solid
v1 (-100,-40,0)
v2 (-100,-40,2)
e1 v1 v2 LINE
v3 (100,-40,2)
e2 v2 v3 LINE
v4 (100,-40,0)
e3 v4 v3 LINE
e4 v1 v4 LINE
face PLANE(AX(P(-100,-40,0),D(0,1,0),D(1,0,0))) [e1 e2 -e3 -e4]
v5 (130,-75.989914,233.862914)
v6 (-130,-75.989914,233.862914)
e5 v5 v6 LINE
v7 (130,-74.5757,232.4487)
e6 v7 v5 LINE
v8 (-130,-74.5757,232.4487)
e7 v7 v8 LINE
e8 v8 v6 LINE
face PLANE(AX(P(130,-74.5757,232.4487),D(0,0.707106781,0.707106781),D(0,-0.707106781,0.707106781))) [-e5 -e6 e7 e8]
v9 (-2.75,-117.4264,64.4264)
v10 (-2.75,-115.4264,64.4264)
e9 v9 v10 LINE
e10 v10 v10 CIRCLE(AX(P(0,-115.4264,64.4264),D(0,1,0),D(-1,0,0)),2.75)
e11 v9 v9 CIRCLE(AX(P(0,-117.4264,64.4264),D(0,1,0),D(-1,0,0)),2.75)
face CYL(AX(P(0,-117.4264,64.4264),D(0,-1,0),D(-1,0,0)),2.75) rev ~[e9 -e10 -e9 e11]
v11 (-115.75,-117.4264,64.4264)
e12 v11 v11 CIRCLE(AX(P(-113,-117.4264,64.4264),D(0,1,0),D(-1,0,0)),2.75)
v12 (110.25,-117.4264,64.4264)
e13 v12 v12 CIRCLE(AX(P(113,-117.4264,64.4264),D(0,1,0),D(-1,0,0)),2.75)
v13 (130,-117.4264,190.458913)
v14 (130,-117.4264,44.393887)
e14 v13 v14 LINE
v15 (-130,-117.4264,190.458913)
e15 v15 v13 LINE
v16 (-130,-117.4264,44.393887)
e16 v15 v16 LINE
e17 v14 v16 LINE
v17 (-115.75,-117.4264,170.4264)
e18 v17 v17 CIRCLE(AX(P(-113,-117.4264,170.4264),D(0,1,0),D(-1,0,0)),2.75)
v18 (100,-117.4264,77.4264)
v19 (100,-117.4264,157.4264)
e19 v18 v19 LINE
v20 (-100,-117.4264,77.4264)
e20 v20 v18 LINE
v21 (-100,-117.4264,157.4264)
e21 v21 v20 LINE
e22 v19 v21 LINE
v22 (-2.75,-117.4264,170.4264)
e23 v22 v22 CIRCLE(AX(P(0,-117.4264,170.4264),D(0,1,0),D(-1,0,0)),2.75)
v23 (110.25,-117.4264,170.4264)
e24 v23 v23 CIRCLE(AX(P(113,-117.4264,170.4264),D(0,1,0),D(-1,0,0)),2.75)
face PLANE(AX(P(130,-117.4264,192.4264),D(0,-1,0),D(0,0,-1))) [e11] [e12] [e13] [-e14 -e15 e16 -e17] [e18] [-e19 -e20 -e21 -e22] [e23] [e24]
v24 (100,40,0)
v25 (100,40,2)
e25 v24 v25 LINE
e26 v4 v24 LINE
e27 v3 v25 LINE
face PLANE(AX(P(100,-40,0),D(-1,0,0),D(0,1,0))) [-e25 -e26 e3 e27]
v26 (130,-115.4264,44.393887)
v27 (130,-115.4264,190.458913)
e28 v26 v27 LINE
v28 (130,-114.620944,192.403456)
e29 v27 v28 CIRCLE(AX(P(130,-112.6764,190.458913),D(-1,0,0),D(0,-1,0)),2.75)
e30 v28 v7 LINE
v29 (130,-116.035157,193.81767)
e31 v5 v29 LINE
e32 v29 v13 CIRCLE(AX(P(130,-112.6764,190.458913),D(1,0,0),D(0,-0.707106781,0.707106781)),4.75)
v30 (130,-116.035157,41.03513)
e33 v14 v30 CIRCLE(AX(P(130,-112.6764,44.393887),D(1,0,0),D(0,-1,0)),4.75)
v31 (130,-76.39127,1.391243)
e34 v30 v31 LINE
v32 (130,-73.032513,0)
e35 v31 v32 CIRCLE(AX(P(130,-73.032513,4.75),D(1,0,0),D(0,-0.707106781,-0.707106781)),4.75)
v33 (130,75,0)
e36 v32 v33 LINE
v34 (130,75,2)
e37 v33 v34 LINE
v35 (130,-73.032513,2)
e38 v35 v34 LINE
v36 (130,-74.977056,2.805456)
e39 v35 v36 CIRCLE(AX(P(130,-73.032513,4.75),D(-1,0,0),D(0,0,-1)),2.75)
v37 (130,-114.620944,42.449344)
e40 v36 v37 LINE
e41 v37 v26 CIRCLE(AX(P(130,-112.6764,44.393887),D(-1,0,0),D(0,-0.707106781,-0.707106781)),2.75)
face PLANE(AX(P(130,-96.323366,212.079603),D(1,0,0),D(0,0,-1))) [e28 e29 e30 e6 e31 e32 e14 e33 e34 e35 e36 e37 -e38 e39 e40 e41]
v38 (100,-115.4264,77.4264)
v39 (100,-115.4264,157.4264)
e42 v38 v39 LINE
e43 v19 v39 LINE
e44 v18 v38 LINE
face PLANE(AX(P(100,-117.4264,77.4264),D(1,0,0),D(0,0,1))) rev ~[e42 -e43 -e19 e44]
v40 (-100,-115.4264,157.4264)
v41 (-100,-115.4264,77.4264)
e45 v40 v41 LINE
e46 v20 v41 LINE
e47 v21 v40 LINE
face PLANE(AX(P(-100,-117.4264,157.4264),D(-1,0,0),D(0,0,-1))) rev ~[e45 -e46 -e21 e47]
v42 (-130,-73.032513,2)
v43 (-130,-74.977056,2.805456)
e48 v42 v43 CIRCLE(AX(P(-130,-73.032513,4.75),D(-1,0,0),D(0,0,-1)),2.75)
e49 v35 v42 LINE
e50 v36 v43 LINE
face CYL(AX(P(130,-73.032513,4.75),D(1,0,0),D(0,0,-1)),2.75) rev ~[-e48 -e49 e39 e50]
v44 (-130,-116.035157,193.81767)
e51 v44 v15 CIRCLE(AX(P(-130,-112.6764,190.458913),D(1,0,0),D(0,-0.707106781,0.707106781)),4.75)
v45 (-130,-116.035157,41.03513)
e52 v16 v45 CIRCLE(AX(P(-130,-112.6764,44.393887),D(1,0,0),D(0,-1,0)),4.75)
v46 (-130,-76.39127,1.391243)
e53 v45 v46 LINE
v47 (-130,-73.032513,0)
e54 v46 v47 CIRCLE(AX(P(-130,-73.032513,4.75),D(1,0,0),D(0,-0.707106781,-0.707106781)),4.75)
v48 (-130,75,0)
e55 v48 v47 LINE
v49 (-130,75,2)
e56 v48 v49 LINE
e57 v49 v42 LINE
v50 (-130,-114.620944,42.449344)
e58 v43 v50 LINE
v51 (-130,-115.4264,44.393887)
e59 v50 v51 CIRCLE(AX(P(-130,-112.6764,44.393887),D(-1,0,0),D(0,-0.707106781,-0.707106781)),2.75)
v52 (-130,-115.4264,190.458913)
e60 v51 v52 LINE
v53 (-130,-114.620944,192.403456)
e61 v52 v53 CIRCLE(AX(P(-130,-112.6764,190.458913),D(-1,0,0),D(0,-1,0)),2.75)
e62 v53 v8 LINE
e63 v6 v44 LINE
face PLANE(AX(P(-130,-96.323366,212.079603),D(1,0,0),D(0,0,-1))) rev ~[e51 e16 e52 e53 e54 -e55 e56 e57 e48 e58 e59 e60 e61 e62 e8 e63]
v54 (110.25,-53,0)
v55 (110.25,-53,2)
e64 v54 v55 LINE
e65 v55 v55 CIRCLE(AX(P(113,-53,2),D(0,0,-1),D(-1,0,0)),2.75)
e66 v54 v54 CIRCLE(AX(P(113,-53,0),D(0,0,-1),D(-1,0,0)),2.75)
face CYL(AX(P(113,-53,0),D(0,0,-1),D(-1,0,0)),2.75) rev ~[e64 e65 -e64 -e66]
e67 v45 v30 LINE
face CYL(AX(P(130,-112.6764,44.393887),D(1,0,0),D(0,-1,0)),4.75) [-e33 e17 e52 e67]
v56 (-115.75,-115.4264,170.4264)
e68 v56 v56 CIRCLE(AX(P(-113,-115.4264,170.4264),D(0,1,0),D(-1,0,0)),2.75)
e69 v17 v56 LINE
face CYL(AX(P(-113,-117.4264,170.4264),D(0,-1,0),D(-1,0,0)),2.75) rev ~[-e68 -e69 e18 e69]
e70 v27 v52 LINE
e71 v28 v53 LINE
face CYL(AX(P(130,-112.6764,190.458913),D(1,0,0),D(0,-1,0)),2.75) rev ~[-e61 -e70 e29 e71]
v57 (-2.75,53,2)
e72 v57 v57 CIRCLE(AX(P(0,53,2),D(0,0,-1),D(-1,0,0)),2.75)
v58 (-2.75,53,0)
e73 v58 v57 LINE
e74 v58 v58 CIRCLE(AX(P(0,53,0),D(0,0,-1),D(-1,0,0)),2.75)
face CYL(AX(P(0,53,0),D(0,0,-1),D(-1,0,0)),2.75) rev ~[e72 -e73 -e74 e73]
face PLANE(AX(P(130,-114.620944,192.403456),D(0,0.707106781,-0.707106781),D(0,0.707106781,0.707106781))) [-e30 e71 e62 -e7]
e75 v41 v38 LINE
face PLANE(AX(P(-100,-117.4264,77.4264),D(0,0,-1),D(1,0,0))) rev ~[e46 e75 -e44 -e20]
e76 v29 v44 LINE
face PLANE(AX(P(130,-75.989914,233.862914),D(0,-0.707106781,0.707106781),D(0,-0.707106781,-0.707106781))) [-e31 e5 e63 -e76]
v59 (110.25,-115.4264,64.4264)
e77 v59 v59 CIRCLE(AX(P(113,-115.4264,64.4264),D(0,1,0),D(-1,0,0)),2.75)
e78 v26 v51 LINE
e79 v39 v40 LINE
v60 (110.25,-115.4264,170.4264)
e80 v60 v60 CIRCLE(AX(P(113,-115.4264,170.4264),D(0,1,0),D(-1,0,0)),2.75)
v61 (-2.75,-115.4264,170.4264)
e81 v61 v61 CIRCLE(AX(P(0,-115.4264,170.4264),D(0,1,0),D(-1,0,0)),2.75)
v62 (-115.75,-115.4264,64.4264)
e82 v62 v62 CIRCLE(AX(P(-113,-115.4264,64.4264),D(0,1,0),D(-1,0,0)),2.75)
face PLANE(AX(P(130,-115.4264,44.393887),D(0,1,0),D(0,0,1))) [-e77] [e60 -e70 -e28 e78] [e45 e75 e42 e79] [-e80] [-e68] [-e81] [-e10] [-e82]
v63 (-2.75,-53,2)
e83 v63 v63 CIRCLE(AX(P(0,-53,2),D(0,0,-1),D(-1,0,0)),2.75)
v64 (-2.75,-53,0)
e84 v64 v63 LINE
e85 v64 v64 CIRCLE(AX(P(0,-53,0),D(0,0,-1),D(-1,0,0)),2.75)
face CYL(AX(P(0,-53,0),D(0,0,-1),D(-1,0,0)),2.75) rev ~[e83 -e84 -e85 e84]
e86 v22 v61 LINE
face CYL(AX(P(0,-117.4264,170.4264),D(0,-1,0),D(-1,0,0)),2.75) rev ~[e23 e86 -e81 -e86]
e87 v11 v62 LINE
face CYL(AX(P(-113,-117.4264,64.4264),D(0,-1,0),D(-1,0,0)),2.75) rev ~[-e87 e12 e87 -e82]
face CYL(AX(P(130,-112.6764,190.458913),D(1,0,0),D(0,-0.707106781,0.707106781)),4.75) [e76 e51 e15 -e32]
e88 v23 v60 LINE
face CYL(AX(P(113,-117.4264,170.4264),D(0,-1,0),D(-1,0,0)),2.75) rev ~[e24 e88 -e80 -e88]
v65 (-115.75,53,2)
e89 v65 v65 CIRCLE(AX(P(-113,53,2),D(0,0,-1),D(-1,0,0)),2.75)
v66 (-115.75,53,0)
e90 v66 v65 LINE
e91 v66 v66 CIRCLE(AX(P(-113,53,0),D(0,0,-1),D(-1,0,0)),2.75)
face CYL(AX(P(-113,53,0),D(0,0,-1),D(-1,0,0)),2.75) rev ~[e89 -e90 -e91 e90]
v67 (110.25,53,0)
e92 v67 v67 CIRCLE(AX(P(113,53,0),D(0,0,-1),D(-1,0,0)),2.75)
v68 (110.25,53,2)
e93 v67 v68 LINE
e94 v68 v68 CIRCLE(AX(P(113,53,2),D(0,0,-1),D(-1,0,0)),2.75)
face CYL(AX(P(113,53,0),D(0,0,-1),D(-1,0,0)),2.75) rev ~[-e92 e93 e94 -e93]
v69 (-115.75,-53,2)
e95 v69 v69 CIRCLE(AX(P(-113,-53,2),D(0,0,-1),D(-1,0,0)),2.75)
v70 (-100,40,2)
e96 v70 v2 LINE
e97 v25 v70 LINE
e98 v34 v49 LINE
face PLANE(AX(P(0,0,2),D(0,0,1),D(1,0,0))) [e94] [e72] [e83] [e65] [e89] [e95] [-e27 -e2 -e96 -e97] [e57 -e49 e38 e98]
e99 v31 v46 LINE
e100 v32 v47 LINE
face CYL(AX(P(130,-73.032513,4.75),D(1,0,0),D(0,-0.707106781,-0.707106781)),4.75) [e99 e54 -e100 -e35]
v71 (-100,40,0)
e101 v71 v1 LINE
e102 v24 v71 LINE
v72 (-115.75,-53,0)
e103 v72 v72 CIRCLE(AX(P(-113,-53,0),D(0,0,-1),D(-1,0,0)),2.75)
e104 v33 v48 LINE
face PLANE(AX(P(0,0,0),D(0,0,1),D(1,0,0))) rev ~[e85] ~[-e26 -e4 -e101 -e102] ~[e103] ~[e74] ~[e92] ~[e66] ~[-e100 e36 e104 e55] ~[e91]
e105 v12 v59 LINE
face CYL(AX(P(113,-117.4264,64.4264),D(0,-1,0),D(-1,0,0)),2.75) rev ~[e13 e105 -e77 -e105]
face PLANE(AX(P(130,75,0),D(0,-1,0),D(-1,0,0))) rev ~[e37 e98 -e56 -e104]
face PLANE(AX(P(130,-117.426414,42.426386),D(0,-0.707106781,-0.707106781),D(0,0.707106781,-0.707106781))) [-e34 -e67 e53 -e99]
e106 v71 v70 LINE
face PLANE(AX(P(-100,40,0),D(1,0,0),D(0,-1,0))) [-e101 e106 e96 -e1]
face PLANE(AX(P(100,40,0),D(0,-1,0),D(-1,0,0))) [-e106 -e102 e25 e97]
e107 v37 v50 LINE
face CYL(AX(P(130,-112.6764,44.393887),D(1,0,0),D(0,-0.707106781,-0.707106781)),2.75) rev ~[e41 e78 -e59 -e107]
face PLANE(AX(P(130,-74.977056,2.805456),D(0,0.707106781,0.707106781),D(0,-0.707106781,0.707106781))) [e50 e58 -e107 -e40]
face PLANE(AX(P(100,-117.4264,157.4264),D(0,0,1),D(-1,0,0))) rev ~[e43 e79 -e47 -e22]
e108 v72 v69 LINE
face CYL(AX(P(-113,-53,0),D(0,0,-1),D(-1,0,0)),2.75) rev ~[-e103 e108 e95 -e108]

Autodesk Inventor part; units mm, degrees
ref_plane "YZ Plane" through (0, 0, 0) normal (1, 0, 0) x (0, 1, 0)
ref_plane "XZ Plane" through (0, 0, 0) normal (0, 1, 0) x (-1, 0, 0)
sketch "Sketch1" plane through (0, 0, 0) normal (0, 0, 1) x (1, 0, 0)
  line L0 (130, 75) -> (-130, 75)
  line L1 (-130, 75) -> (-130, -75)
  line L2 (-130, -75) -> (130, -75)
  line L3 (130, -75) -> (130, 75)
  line L4 (130, 75) -> (-130, -75) construction
  line L5 (-130, 75) -> (130, -75) construction
  line L6 (100, 40) -> (-100, 40)
  line L7 (-100, 40) -> (-100, -40)
  line L8 (-100, -40) -> (100, -40)
  line L9 (100, -40) -> (100, 40)
  line L10 (100, 40) -> (-100, -40) construction
  line L11 (-100, 40) -> (100, -40) construction
  point P0 (0, 0)
  point P1 (0, 0)
  point P2 (0, 0)
  point P3 (100, 0)
  point P4 (130, 0)
  dimension "d34" = 200
  dimension "d35" = 80
  dimension "d51" = 30
  dimension "d53" = 30
  dimension "d54" = 35
  dimension "d56" = 150
extrude "Plate1" add sketch "Sketch1" along normal blind 2
sketch "Sketch6" plane through (130, -73.5858, 1.4142) normal (0, -0.7071068, -0.7071068) x (1, 0, 0)
  line L0 (-260, 0) -> (0, 0)
  line L1 (0, 0) -> (0, 60)
  line L2 (0, 60) -> (-260, 60)
  line L3 (-260, 60) -> (-260, 0)
edge flange "Flange2" height 60 angle 45 thickness 2 bend radius 2.75 thickness toward (0, -0.7071068, -0.7071068) relief round relief width 2 relief depth 1 edges at (0, -75, 2) wall of the first edge with corners at (-130, -73.5858, 1.4142) (130, -73.5858, 1.4142) (130, -116.0122, 43.8406) (-130, -116.0122, 43.8406)
bend "Bend2"
corner "Corner2"
sketch "Sketch8" plane through (130, -115.4264, 42.4264) normal (0, -1, 0) x (1, 0, 0)
  line L0 (-260, 0) -> (0, 0)
  line L1 (0, 0) -> (0, 150)
  line L2 (0, 150) -> (-260, 150)
  line L3 (-260, 150) -> (-260, 0)
edge flange "Flange3" height 150 angle 45 thickness 2 bend radius 2.75 thickness toward (0, -1, 0) relief round relief width 2 relief depth 1 edges at (0, -116.0122, 43.8406) wall of the first edge with corners at (-130, -115.4264, 42.4264) (130, -115.4264, 42.4264) (130, -115.4264, 192.4264) (-130, -115.4264, 192.4264)
bend "Bend3"
corner "Corner3"
sketch "Sketch9" plane through (130, -116.0122, 191.0122) normal (0, -0.7071068, 0.7071068) x (1, 0, 0)
  line L0 (-260, 0) -> (0, 0)
  line L1 (0, 0) -> (0, 58.6)
  line L2 (0, 58.6) -> (-260, 58.6)
  line L3 (-260, 58.6) -> (-260, 0)
edge flange "Flange4" height 58.6 angle 45 thickness 2 bend radius 2.75 thickness toward (0, -0.7071068, 0.7071068) relief round relief width 2 relief depth 1 edges at (0, -115.4264, 192.4264) wall of the first edge with corners at (-130, -116.0122, 191.0122) (130, -116.0122, 191.0122) (130, -74.5757, 232.4487) (-130, -74.5757, 232.4487)
bend "Bend4"
corner "Corner4"
sketch "Sketch10" plane through (-130, -117.4264, 44.3939) normal (0, -1, 0) x (1, 0, 0)
  line L0 (260, 146.065) -> (0, 146.065) projected
  line L1 (0, 0) -> (0, 146.065) projected
  line L2 (0, 0) -> (260, 0) projected
  line L3 (260, 146.065) -> (260, 0) projected
  line L4 (30, 33.0325) -> (230, 33.0325)
  line L5 (230, 33.0325) -> (230, 113.0325)
  line L6 (230, 113.0325) -> (30, 113.0325)
  line L7 (30, 113.0325) -> (30, 33.0325)
  point P0 (130, -44.3939)
  point P1 (30, 73.0325)
  point P2 (0, 73.0325)
  dimension "d77" = 80
  dimension "d78" = 200
  dimension "d79" = 30
extrude "Cut3" cut sketch "Sketch10" against normal blind 2 contours L7 L6 L5 L4
sketch "Sketch11" plane through (0, 0, 0) normal (0, 0, -1) x (-1, 0, 0)
  line L0 (100, -40) -> (-100, -40) construction
  line L1 (-100, -40) -> (-100, 40) construction
  line L2 (-100, 40) -> (100, 40) construction
  line L3 (100, 40) -> (100, -40) construction
  circle A0 centre (0, -53) radius 2.75
  circle A1 centre (0, 53) radius 2.75
  line L4 (-100, 0) -> (100, 0) construction
  point P0 (0, 0)
  dimension "d82" = 106
  dimension "d83" = 5.5
extrude "Cut4" cut sketch "Sketch11" against normal blind 2
pattern_linear "Rectangular Pattern1" count 3 spacing 113 along (1, 0, 0) of "Cut4" first direction both ways yes
ref_plane "Work Plane1" through (0, -117.4264, 0) normal (0, 0.7071068, -0.7071068) x (1, 0, 0)
mirror "Mirror1" about plane through (0, -117.4264, 0) normal (0, 0.7071068, -0.7071068) of "Cut4", "Rectangular Pattern1"
equation "\"d34\" = MAIN_6_central_window_hight"
equation "\"d35\" = MAIN_7_central_window_width"
equation "\"d56\" = Wall_1_width"
equation "\"d77\" = MAIN_7_central_window_width"
equation "\"d78\" = MAIN_6_central_window_hight"
equation "\"d79\" = d53"
equation "\"d80\" = Thickness"
equation "\"d84\" = Thickness"
equation "\"d2\" = Thickness"
equation "\"d36\" = BendReliefWidth"
equation "\"d37\" = BendReliefDepth"
equation "\"d38\" = MinimumRemnant"
equation "\"d39\" = TransitionRadius"
equation "\"d40\" = Wall_2_width"
equation "\"d42\" = BendRadius"
equation "\"d43\" = CornerReliefSize"
equation "\"d44\" = GapSize"
equation "\"d45\" = JacobiRadiusSize"
equation "\"d57\" = BendReliefWidth"
equation "\"d58\" = BendReliefDepth"
equation "\"d59\" = MinimumRemnant"
equation "\"d60\" = TransitionRadius"
equation "\"d61\" = d56"
equation "\"d63\" = BendRadius"
equation "\"d64\" = CornerReliefSize"
equation "\"d65\" = GapSize"
equation "\"d66\" = JacobiRadiusSize"
equation "\"d67\" = BendReliefWidth"
equation "\"d68\" = BendReliefDepth"
equation "\"d69\" = MinimumRemnant"
equation "\"d70\" = TransitionRadius"
equation "\"d71\" = Wall_2_width - 0.7 * Thickness"
equation "\"d73\" = BendRadius"
equation "\"d74\" = CornerReliefSize"
equation "\"d75\" = GapSize"
equation "\"d76\" = JacobiRadiusSize"
equation "\"BendReliefWidth\" = Thickness"
equation "\"BendReliefDepth\" = 0.5 * Thickness"
equation "\"CornerReliefSize\" = 4 * Thickness"
equation "\"MinimumRemnant\" = 2 * Thickness"
equation "\"TransitionRadius\" = BendRadius"
equation "\"JacobiRadiusSize\" = BendRadius"
equation "\"GapSize\" = Thickness"
equation "\"MAIN_6_central_window_hight\" = 200"
equation "\"MAIN_7_central_window_width\" = 80"
equation "\"Wall_1_width\" = 150"
equation "\"Thickness\" = 2"
equation "\"Wall_2_width\" = 60"
equation "\"BendRadius\" = 2.75"
properties part number "TKS 3554 BOTTOM DS box wall 1" material "Stainless Steel"
